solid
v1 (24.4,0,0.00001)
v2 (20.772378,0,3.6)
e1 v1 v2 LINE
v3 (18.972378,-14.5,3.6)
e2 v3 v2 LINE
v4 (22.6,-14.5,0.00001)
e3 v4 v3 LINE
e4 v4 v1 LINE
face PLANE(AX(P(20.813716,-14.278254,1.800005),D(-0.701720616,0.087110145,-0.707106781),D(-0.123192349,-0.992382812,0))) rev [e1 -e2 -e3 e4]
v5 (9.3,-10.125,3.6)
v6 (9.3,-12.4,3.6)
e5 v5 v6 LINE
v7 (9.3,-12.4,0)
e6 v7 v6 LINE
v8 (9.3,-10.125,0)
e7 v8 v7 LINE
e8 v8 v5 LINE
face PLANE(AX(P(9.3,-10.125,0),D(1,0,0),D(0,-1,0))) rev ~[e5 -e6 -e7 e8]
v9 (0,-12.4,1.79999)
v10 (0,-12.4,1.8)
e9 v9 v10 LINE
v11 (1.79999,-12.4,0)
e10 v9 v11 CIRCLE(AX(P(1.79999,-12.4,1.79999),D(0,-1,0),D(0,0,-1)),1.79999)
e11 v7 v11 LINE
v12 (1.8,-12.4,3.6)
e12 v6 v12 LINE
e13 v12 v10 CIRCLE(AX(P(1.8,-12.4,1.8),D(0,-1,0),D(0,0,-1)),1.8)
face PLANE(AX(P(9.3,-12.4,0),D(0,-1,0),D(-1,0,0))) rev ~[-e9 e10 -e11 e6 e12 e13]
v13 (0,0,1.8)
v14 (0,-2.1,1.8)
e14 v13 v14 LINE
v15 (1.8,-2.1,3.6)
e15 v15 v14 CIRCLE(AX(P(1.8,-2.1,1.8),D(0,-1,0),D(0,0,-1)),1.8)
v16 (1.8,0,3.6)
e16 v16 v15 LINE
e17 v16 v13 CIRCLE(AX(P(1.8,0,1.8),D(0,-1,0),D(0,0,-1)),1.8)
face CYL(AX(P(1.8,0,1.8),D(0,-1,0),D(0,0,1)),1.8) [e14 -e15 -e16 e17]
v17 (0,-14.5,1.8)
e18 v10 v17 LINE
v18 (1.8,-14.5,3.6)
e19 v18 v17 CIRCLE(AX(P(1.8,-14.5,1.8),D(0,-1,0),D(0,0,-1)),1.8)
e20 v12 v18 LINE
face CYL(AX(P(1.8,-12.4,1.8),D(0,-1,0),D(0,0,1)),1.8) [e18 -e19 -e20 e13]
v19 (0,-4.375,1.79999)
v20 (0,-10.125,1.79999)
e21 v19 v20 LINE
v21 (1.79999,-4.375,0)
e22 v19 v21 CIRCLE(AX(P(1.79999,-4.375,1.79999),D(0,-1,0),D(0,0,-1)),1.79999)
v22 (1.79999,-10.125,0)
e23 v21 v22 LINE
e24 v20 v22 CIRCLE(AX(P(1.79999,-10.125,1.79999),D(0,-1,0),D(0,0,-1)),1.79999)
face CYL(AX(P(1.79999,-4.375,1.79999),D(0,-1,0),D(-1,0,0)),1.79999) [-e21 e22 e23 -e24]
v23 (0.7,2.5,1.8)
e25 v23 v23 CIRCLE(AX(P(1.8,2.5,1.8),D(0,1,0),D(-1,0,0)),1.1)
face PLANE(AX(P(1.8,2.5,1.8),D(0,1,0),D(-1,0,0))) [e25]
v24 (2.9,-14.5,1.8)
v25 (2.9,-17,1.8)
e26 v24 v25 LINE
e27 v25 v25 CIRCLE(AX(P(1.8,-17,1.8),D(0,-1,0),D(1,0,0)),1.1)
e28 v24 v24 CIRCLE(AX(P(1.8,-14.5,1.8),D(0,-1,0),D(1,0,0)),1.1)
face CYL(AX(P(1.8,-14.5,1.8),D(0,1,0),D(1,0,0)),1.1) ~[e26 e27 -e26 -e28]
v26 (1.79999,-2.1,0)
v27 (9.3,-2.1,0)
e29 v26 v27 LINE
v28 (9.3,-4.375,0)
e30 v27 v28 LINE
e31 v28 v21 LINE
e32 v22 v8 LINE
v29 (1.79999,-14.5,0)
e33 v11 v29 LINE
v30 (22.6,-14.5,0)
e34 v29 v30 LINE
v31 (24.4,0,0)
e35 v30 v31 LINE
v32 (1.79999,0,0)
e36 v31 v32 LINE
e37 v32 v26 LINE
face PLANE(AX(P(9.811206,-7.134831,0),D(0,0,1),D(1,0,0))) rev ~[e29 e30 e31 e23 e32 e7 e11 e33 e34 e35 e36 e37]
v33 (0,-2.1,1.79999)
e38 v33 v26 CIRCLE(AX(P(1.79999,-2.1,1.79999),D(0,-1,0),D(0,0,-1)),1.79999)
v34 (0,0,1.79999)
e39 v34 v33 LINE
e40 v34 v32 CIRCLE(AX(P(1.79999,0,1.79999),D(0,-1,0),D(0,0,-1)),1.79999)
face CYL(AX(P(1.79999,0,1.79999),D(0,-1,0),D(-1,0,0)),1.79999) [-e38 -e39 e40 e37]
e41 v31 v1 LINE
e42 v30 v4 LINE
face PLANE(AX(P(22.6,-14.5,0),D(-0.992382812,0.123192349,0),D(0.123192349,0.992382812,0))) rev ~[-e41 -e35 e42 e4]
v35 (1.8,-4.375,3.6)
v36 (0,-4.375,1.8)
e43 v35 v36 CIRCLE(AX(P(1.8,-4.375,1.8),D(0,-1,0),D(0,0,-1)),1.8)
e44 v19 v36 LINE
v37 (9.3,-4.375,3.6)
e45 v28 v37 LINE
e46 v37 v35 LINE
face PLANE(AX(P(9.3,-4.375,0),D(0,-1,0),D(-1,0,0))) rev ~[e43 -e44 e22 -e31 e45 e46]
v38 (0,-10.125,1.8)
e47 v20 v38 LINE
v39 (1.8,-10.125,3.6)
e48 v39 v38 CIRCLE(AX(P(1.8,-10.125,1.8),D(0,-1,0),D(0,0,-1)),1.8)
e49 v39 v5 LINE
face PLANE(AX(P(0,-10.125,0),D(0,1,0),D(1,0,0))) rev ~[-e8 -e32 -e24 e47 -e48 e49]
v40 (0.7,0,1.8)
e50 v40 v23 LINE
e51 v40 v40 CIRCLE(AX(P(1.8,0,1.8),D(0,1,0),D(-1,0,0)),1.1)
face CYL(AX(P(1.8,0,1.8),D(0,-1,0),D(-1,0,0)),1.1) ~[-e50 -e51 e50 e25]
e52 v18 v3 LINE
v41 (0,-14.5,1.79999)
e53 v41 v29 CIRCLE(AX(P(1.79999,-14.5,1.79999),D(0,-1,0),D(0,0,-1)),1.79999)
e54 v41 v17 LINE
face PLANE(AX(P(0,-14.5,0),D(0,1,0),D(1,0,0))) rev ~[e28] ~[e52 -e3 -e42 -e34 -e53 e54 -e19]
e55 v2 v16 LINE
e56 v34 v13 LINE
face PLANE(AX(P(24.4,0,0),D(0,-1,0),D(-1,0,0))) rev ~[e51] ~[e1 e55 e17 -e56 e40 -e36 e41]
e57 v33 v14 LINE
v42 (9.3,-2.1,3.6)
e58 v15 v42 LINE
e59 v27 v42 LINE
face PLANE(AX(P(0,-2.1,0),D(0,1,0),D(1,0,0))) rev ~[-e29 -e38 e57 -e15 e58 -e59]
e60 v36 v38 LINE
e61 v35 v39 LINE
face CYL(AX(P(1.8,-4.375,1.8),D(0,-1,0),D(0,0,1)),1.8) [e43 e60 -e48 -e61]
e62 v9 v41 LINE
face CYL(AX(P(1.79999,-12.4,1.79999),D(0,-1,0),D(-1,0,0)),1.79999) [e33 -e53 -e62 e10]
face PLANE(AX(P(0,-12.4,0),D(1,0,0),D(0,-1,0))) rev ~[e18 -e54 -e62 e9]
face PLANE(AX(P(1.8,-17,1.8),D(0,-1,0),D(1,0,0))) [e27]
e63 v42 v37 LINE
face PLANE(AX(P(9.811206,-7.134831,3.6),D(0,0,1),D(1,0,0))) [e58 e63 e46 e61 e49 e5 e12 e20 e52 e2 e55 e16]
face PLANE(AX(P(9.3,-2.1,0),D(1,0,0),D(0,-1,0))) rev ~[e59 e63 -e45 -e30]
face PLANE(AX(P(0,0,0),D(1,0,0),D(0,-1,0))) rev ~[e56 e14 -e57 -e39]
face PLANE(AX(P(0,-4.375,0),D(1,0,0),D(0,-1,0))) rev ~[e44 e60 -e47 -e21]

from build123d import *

# Parameters (mm, degrees)
F1_DEPTH  = 3.6
F2_SIZE2  = 3.59999
F2_SIZE   = 3.59999
F3_R      = 1.8
F4_R      = 1.79999
F5_R      = 1.8
F6_R      = 1.79999
F7_R      = 1.8
F8_R      = 1.79999
F9_R      = 1.1
F10_DEPTH = 2.5
F11_R     = 1.1
F12_DEPTH = 2.5


# Not quite as in the source:
# - a fillet or chamfer is up to 0.001 mm smaller than in the source, because OpenCascade refuses the exact size


with BuildPart() as f1:
    # F0 (on Top) → F1 (new body)
    with BuildSketch(Plane.XY):
        Polygon((24.4, 0), (0, 0), (0, -2.1), (9.3, -2.1), (9.3, -4.375), (0, -4.375), (0, -10.125), (9.3, -10.125), (9.3, -12.4), (0, -12.4), (0, -14.5), (22.6, -14.5), align=None)
    extrude(amount=F1_DEPTH)

    # F2 (size 3.6 and 3.6 in the source; OpenCascade refuses exactly that, so slightly less here)
    f2_edges = [f1.edges().sort_by_distance(p)[0] for p in [
        (23.5, -7.25, 3.6),
    ]]
    chamfer(f2_edges, length=F2_SIZE, length2=F2_SIZE2)

    # F3
    f3_edges = [f1.edges().sort_by_distance(p)[0] for p in [
        (0, -7.25, 3.6),
    ]]
    fillet(f3_edges, radius=F3_R)

    # F4 (radius 1.8 in the source; OpenCascade refuses exactly that, so slightly less here)
    f4_edges = [f1.edges().sort_by_distance(p)[0] for p in [
        (0, -7.25, 0),
    ]]
    fillet(f4_edges, radius=F4_R)

    # F5
    f5_edges = [f1.edges().sort_by_distance(p)[0] for p in [
        (0, -13.45, 3.6),
    ]]
    fillet(f5_edges, radius=F5_R)

    # F6 (radius 1.8 in the source; OpenCascade refuses exactly that, so slightly less here)
    f6_edges = [f1.edges().sort_by_distance(p)[0] for p in [
        (0, -13.45, 0),
    ]]
    fillet(f6_edges, radius=F6_R)

    # F7
    f7_edges = [f1.edges().sort_by_distance(p)[0] for p in [
        (0, -1.05, 3.6),
    ]]
    fillet(f7_edges, radius=F7_R)

    # F8 (radius 1.8 in the source; OpenCascade refuses exactly that, so slightly less here)
    f8_edges = [f1.edges().sort_by_distance(p)[0] for p in [
        (0, -1.05, 0),
    ]]
    fillet(f8_edges, radius=F8_R)

    # F9 (on face) → F10 (join)
    with BuildSketch(Plane.XZ.offset(14.5)):
        with Locations((1.8, 1.8)):
            Circle(F9_R)
    extrude(amount=F10_DEPTH)

    # F11 (on face) → F12 (join)
    with BuildSketch(Plane(origin=(0, 0, 0), x_dir=(-1, 0, 0), z_dir=(0, 1, 0))):
        with Locations((-1.8, 1.8)):
            Circle(F11_R)
    extrude(amount=F12_DEPTH)


solid = f1.part
